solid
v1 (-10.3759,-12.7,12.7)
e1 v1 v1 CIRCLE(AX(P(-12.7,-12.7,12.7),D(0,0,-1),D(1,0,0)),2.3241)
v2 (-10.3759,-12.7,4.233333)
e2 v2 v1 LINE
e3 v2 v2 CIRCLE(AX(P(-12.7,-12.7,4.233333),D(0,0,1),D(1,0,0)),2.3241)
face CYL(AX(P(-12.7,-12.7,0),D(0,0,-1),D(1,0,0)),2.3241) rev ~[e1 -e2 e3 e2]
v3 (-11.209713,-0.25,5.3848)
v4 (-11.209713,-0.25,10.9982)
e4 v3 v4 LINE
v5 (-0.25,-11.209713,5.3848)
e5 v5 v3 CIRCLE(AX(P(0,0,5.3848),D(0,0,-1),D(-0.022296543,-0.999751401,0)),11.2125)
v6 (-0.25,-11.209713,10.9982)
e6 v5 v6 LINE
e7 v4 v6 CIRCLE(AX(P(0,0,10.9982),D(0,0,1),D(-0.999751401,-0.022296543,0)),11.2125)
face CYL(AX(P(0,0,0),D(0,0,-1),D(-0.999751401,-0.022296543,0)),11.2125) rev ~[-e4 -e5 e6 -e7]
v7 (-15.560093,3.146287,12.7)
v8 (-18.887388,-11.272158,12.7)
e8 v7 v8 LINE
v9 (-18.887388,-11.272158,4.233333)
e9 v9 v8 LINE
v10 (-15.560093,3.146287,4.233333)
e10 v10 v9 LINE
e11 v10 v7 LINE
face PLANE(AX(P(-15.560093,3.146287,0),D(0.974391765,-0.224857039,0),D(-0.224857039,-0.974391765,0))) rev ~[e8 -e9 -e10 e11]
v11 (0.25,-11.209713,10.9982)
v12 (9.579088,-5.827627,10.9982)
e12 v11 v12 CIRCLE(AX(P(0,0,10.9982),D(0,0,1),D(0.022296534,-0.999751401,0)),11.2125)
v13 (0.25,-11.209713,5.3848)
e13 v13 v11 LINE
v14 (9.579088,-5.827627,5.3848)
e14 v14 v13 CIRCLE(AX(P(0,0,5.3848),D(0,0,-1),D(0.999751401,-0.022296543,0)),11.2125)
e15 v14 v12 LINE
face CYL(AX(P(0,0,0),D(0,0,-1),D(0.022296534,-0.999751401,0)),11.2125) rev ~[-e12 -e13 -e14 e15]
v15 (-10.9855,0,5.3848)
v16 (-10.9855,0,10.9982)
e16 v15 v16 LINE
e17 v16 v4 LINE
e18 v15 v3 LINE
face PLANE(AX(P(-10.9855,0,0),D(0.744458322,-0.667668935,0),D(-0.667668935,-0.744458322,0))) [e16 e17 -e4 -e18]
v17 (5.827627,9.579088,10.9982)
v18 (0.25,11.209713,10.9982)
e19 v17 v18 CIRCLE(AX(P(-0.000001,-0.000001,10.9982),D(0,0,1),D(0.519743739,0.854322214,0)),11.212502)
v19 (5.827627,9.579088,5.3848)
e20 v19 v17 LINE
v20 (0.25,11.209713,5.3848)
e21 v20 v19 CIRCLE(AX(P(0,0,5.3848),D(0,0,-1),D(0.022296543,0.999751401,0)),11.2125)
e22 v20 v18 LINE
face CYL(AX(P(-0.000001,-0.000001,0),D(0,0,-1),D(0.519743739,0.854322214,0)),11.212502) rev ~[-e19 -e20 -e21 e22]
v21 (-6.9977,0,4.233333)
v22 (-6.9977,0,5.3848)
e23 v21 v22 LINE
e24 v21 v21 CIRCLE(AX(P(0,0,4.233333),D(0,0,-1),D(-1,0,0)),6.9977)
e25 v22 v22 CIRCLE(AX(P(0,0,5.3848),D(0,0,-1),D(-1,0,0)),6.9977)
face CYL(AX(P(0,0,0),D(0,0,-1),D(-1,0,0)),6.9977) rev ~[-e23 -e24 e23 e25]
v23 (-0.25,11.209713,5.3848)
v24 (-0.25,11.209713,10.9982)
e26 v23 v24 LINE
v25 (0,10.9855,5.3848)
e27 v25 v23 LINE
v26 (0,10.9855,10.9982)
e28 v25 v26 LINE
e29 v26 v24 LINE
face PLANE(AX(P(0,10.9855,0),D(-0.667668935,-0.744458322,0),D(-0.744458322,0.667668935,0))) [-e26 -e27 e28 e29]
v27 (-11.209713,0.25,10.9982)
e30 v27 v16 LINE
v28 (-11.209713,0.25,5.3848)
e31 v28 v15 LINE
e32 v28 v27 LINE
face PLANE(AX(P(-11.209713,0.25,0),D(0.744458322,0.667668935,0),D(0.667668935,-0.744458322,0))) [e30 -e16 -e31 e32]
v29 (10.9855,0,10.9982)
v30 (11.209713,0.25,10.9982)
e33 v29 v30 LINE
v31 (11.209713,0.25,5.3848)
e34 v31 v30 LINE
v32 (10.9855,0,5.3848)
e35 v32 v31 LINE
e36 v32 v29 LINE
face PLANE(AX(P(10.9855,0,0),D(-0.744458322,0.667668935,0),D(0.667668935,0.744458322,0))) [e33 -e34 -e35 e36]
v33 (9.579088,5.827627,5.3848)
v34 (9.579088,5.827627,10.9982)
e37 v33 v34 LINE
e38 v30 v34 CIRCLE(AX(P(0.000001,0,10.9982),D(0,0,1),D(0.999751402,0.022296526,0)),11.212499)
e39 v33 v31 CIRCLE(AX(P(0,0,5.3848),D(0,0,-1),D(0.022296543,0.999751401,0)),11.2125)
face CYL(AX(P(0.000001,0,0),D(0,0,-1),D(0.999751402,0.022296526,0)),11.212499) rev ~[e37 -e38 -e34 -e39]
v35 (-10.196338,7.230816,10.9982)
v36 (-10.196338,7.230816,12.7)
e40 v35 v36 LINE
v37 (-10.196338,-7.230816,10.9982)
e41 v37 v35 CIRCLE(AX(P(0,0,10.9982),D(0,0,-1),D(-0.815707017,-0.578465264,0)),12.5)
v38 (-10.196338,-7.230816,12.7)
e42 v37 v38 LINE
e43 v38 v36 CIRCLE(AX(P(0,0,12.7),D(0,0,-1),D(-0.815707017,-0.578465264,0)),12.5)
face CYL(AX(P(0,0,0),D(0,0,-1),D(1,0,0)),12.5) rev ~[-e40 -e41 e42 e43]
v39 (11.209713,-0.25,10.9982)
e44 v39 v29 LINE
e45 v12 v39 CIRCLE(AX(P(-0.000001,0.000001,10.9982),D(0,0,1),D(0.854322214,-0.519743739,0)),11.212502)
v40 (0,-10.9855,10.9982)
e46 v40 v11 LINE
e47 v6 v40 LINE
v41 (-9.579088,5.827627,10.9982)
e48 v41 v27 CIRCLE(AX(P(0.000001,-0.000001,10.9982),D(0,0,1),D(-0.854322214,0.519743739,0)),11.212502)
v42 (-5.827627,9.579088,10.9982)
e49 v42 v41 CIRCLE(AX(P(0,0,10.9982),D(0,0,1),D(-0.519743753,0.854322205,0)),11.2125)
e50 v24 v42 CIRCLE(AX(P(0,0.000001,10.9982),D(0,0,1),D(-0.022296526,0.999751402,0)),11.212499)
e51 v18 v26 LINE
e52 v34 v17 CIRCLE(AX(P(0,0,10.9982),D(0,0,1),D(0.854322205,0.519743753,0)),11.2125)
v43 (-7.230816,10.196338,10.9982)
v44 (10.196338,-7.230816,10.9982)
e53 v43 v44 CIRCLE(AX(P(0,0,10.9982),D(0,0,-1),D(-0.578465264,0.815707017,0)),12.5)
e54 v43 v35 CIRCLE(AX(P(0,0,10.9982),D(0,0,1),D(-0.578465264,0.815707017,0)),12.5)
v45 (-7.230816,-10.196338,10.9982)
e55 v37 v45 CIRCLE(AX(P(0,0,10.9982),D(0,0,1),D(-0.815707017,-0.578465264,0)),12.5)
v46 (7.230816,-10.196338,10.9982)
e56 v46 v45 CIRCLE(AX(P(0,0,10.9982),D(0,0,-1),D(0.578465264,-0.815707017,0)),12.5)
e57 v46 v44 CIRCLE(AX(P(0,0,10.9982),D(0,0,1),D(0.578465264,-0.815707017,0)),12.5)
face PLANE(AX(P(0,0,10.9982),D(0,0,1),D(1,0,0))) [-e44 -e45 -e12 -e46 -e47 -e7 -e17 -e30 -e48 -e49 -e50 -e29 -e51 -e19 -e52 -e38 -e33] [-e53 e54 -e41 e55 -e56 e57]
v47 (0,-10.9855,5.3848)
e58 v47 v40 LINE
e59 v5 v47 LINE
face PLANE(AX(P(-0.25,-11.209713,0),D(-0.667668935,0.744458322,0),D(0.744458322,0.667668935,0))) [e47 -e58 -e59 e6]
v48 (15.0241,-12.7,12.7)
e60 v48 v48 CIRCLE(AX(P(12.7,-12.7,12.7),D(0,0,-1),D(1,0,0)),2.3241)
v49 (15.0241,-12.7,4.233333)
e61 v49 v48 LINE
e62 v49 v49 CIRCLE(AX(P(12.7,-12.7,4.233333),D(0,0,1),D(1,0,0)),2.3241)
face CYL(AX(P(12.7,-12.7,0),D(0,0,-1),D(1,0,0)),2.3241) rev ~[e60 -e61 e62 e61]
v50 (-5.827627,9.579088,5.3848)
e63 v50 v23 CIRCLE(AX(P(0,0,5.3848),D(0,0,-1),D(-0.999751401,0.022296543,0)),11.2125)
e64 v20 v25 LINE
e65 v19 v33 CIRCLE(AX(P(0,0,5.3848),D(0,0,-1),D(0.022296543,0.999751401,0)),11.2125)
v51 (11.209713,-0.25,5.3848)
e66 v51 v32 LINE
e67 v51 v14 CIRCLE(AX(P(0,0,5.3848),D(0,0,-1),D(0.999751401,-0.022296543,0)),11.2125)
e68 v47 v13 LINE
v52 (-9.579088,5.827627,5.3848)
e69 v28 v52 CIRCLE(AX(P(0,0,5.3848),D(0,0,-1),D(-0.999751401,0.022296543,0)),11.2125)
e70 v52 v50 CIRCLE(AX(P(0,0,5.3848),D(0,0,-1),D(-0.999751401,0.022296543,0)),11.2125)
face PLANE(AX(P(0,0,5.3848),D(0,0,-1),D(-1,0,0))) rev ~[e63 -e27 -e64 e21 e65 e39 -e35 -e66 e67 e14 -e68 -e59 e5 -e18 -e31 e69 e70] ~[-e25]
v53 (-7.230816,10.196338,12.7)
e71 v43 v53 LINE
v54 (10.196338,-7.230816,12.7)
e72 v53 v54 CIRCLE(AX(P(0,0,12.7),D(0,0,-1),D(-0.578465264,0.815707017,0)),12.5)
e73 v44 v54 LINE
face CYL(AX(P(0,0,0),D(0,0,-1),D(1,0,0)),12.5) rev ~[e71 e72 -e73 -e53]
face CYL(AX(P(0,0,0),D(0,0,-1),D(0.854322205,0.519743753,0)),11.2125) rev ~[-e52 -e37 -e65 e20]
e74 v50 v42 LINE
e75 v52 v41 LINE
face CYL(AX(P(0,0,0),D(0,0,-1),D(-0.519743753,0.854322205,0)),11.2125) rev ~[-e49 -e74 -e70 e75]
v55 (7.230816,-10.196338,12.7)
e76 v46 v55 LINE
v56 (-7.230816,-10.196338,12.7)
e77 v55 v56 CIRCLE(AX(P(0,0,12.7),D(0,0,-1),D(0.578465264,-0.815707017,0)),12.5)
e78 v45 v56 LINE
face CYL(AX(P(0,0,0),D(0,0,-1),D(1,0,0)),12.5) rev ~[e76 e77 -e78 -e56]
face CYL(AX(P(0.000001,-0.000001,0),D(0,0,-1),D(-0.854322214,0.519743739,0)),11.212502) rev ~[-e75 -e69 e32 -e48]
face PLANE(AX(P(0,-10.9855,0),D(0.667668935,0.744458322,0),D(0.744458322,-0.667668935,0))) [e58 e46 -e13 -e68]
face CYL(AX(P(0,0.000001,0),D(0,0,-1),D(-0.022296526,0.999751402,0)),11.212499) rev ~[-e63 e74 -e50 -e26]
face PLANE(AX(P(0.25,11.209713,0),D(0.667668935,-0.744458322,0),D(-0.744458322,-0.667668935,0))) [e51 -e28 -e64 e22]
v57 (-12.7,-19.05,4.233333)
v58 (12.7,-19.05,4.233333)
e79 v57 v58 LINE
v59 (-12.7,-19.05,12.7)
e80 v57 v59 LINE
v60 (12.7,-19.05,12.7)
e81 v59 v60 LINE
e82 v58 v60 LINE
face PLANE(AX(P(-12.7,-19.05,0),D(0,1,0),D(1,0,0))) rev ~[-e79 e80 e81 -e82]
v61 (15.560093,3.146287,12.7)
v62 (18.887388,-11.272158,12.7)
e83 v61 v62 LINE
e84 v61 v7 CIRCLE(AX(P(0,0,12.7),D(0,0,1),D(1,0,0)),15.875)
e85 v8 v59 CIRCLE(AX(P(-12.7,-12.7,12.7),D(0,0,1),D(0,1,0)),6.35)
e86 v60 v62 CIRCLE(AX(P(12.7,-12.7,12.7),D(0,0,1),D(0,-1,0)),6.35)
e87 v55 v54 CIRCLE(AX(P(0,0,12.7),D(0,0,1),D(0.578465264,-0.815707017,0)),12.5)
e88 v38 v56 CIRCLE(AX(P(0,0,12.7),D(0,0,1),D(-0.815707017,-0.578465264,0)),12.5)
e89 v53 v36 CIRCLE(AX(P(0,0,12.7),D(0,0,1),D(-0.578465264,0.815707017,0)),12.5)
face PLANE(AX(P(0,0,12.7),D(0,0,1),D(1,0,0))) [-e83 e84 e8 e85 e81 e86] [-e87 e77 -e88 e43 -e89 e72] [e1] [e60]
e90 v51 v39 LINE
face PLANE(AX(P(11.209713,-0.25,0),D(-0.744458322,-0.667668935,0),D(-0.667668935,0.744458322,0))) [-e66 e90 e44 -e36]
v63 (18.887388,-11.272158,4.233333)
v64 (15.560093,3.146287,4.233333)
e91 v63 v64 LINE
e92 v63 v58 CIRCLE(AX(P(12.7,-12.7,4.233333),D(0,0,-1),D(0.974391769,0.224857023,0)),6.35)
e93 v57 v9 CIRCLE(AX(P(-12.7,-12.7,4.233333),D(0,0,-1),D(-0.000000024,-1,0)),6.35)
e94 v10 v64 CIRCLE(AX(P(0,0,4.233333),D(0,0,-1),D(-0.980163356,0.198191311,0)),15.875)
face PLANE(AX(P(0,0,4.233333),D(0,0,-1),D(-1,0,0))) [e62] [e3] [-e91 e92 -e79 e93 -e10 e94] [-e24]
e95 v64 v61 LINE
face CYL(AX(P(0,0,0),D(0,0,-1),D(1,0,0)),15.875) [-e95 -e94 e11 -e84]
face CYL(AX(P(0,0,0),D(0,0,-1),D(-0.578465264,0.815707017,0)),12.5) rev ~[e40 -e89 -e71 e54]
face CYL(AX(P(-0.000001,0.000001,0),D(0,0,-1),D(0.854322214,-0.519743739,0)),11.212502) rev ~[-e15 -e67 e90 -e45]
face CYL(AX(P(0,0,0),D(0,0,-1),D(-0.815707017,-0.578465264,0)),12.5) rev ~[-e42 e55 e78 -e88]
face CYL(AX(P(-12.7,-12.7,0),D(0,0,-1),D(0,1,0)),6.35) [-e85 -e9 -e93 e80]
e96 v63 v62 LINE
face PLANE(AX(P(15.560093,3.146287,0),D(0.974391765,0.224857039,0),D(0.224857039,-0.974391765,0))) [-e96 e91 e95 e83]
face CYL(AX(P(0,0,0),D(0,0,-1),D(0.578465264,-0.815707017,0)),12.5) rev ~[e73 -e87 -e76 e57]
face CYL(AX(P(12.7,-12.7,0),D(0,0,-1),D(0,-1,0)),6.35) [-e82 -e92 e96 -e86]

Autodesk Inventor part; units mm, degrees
ref_plane "YZ Plane" through (0, 0, 0) normal (1, 0, 0) x (0, 1, 0)
ref_plane "XZ Plane" through (0, 0, 0) normal (0, 1, 0) x (-1, 0, 0)
ref_plane "XY Plane" through (0, 0, 0) normal (0, 0, 1) x (1, 0, 0)
sketch "Sketch1" plane through (0, 0, 0) normal (0, 0, 1) x (1, 0, 0)
  arc A0 (-5.827627, -9.579088) -> (-0.250527, -11.231057) centre (0.025157, -0.060123) ccw
  arc A1 (0.25, -11.209713) -> (5.829601, -9.582326) centre (0.025157, -0.060123) ccw
  line L0 (0.46552, -11.403002) -> (0, -10.9855)
  line L1 (0, -10.9855) -> (-0.46552, -11.403002)
  arc A2 (-11.176173, -0.249433) -> (-9.579088, -5.827627) centre (0.025157, -0.060123) ccw
  line L2 (-11.403002, -0.46552) -> (-10.9855, 0)
  line L3 (-10.9855, 0) -> (-11.403002, 0.46552)
  arc A3 (-9.579088, 5.827627) -> (-11.209713, 0.25) centre (0, 0) ccw
  arc A4 (5.827627, 9.579088) -> (0.25, 11.209713) centre (0, 0) ccw
  line L4 (0, 10.9855) -> (0.46552, 11.403002)
  line L5 (-0.46552, 11.403002) -> (0, 10.9855)
  arc A5 (-0.25, 11.209713) -> (-5.827627, 9.579088) centre (0, 0) ccw
  arc A6 (11.209713, 0.25) -> (9.579088, 5.827627) centre (0, 0) ccw
  line L6 (11.403002, 0.46552) -> (10.9855, 0)
  line L7 (10.9855, 0) -> (11.403002, -0.46552)
  arc A7 (9.579088, -5.827627) -> (11.209713, -0.25) centre (0, 0) ccw
  arc A8 (7.230816, -10.196338) -> (10.196338, -7.230816) centre (0, 0) ccw
  arc A9 (-10.196338, -7.230816) -> (-7.230816, -10.196338) centre (0, 0) ccw
  arc A10 (-7.230816, 10.196338) -> (-10.196338, 7.230816) centre (0, 0) ccw
  circle A11 centre (0, 0) radius 12.5
  circle A12 centre (12.7, -12.7) radius 2.3241
  circle A13 centre (-12.7, -12.7) radius 2.3241
  line L8 (-19.05, -12.7) -> (19.05, -12.7) construction
  line L9 (-12.7, -19.05) -> (12.7, -19.05)
  line L10 (12.7, -6.35) -> (-12.7, -6.35)
  arc A14 (-12.7, -6.35) -> (-12.7, -19.05) centre (-12.7, -12.7) ccw
  arc A15 (12.7, -19.05) -> (12.7, -6.35) centre (12.7, -12.7) ccw
  circle A16 centre (0, 0) radius 11.2125
  circle A17 centre (0, 0) radius 15.875
  line L11 (15.560093, 3.146287) -> (18.887388, -11.272158)
  line L12 (0, -10.9855) -> (0, -12.5)
  line L13 (-15.560093, 3.146287) -> (-18.887388, -11.272158)
  point P0 (-0.46552, -11.403002)
  point P1 (-11.403002, -0.46552)
  point P2 (0, -12.7)
  point P3 (10.196338, -7.230816)
  point P4 (7.230816, -10.196338)
  point P5 (-7.230816, -10.196338)
  point P6 (-10.196338, -7.230816)
  point P7 (-10.196338, 7.230816)
  point P8 (-7.230816, 10.196338)
  point P9 (-0.25, -11.209713)
  point P10 (0.25, -11.209713)
  point P11 (9.579088, -5.827627)
  point P12 (9.579088, 5.827627)
  point P13 (-5.827627, 9.579088)
  point P14 (-9.579088, 5.827627)
  point P15 (-11.209713, -0.25)
  dimension "d0" = 25
  dimension "d9" = 31.75
  dimension "d1" = 4.6482
  dimension "d2" = 4.6482
  dimension "d4" = 6.35
  dimension "d5" = 6.35
  dimension "d6" = 12.7
  dimension "d8" = 25.4
extrude "Extrusion1" add sketch "Sketch1" along normal blind 12.7 contours L10 A14 A17 A15 A11 A10 | A11 A9 A8 L10 A15 A17 A12 A13 A14 | A17 A13 A12 A15 L9 A14 | A14 L13 A17 | A17 L11 A15
extrude "Extrusion2" add sketch "Sketch1" along normal blind 10.9982 contours A16 L1 A0 | A0 L1 A16 L12 A11 A9 L10 | A16 L10 L0 L1 | A16 L2 L3 A3 A5 L5 L4 A4 A6 L6 L7 A7 L10 | L10 A11 A10 A16 A7 A6 A4 A5 A3 | L1 L12 A16 | L10 A11 A8 L12 A16 | L0 A16 L12 | A16 L3 L2 | L7 L6 A16 | A16 L4 L5
sketch "Sketch1 outline for Extrusion3" plane through (0, 0, 0) normal (0, 0, 1) x (1, 0, 0)
  arc A0 (-11.209713, -0.25) -> (-0.25, -11.209713) centre (0, 0) ccw
  line L0 (-10.9855, 0) -> (-11.209713, -0.25)
  line L1 (-11.209713, 0.25) -> (-10.9855, 0)
  arc A1 (-9.579088, 5.827627) -> (-11.209713, 0.25) centre (0, 0) ccw
  arc A2 (-5.827627, 9.579088) -> (-9.579088, 5.827627) centre (0, 0) ccw
  arc A3 (-0.25, 11.209713) -> (-5.827627, 9.579088) centre (0, 0) ccw
  line L2 (0, 10.9855) -> (-0.25, 11.209713)
  line L3 (0.25, 11.209713) -> (0, 10.9855)
  arc A4 (5.827627, 9.579088) -> (0.25, 11.209713) centre (0, 0) ccw
  arc A5 (9.579088, 5.827627) -> (5.827627, 9.579088) centre (0, 0) ccw
  arc A6 (11.209713, 0.25) -> (9.579088, 5.827627) centre (0, 0) ccw
  line L4 (10.9855, 0) -> (11.209713, 0.25)
  line L5 (11.209713, -0.25) -> (10.9855, 0)
  arc A7 (9.579088, -5.827627) -> (11.209713, -0.25) centre (0, 0) ccw
  arc A8 (0.25, -11.209713) -> (9.579088, -5.827627) centre (0, 0) ccw
  line L6 (0, -10.9855) -> (0.25, -11.209713)
  line L7 (-0.25, -11.209713) -> (0, -10.9855)
extrude "Extrusion3" cut sketch "Sketch1 outline for Extrusion3" along normal blind 10.9982
sketch "Sketch2" plane through (0, 0, 0) normal (0, 0, -1) x (-1, 0, 0)
  arc A0 (-0.25, 11.209713) -> (-11.209713, 0.25) centre (0, 0) ccw
  arc A1 (11.209713, 0.25) -> (0.25, 11.209713) centre (0, 0) ccw
  line L0 (0, 10.9855) -> (0.25, 11.209713)
  line L1 (-0.25, 11.209713) -> (0, 10.9855)
  line L2 (11.209713, 0.25) -> (10.9855, 0)
  line L3 (10.9855, 0) -> (11.209713, -0.25)
  arc A2 (0.25, -11.209713) -> (11.209713, -0.25) centre (0, 0) ccw
  line L4 (0.25, -11.209713) -> (0, -10.9855)
  line L5 (0, -10.9855) -> (-0.25, -11.209713)
  arc A3 (-11.209713, -0.25) -> (-0.25, -11.209713) centre (0, 0) ccw
  line L6 (-11.209713, -0.25) -> (-10.9855, 0)
  line L7 (-10.9855, 0) -> (-11.209713, 0.25)
  circle A4 centre (0, 0) radius 6.9977
  point P0 (0, 0)
  dimension "d16" = 13.9954
extrude "Extrusion4" add sketch "Sketch2" against normal blind 5.3848
sketch "Sketch3" plane through (0, 0, 0) normal (0, 0, -1) x (-1, 0, 0)
  circle A0 centre (0, 0) radius 6.9977
  arc A1 (12.7, -19.05) -> (18.887388, -11.272158) centre (12.7, -12.7) ccw
  line L0 (15.560093, 3.146287) -> (18.887388, -11.272158)
  arc A2 (15.560093, 3.146287) -> (-15.560093, 3.146287) centre (0, 0) ccw
  line L1 (-18.887388, -11.272158) -> (-15.560093, 3.146287)
  arc A3 (-18.887388, -11.272158) -> (-12.7, -19.05) centre (-12.7, -12.7) ccw
  line L2 (12.7, -19.05) -> (-12.7, -19.05)
  circle A4 centre (12.7, -12.7) radius 2.3241
  circle A5 centre (-12.7, -12.7) radius 2.3241
  point P0 (0, 0)
extrude "Extrusion5" cut sketch "Sketch3" against normal blind 4.233333
sketch "Sketch4" plane through (0, 0, 4.233333) normal (0, 0, -1) x (-1, 0, 0)
  point P0 (0, 0)
sketch "Sketch5" plane through (0, 0, 4.233333) normal (0, 0, -1) x (-1, 0, 0)
  point P0 (0, 0)
properties part number "Conveyor Bearing Housing"
